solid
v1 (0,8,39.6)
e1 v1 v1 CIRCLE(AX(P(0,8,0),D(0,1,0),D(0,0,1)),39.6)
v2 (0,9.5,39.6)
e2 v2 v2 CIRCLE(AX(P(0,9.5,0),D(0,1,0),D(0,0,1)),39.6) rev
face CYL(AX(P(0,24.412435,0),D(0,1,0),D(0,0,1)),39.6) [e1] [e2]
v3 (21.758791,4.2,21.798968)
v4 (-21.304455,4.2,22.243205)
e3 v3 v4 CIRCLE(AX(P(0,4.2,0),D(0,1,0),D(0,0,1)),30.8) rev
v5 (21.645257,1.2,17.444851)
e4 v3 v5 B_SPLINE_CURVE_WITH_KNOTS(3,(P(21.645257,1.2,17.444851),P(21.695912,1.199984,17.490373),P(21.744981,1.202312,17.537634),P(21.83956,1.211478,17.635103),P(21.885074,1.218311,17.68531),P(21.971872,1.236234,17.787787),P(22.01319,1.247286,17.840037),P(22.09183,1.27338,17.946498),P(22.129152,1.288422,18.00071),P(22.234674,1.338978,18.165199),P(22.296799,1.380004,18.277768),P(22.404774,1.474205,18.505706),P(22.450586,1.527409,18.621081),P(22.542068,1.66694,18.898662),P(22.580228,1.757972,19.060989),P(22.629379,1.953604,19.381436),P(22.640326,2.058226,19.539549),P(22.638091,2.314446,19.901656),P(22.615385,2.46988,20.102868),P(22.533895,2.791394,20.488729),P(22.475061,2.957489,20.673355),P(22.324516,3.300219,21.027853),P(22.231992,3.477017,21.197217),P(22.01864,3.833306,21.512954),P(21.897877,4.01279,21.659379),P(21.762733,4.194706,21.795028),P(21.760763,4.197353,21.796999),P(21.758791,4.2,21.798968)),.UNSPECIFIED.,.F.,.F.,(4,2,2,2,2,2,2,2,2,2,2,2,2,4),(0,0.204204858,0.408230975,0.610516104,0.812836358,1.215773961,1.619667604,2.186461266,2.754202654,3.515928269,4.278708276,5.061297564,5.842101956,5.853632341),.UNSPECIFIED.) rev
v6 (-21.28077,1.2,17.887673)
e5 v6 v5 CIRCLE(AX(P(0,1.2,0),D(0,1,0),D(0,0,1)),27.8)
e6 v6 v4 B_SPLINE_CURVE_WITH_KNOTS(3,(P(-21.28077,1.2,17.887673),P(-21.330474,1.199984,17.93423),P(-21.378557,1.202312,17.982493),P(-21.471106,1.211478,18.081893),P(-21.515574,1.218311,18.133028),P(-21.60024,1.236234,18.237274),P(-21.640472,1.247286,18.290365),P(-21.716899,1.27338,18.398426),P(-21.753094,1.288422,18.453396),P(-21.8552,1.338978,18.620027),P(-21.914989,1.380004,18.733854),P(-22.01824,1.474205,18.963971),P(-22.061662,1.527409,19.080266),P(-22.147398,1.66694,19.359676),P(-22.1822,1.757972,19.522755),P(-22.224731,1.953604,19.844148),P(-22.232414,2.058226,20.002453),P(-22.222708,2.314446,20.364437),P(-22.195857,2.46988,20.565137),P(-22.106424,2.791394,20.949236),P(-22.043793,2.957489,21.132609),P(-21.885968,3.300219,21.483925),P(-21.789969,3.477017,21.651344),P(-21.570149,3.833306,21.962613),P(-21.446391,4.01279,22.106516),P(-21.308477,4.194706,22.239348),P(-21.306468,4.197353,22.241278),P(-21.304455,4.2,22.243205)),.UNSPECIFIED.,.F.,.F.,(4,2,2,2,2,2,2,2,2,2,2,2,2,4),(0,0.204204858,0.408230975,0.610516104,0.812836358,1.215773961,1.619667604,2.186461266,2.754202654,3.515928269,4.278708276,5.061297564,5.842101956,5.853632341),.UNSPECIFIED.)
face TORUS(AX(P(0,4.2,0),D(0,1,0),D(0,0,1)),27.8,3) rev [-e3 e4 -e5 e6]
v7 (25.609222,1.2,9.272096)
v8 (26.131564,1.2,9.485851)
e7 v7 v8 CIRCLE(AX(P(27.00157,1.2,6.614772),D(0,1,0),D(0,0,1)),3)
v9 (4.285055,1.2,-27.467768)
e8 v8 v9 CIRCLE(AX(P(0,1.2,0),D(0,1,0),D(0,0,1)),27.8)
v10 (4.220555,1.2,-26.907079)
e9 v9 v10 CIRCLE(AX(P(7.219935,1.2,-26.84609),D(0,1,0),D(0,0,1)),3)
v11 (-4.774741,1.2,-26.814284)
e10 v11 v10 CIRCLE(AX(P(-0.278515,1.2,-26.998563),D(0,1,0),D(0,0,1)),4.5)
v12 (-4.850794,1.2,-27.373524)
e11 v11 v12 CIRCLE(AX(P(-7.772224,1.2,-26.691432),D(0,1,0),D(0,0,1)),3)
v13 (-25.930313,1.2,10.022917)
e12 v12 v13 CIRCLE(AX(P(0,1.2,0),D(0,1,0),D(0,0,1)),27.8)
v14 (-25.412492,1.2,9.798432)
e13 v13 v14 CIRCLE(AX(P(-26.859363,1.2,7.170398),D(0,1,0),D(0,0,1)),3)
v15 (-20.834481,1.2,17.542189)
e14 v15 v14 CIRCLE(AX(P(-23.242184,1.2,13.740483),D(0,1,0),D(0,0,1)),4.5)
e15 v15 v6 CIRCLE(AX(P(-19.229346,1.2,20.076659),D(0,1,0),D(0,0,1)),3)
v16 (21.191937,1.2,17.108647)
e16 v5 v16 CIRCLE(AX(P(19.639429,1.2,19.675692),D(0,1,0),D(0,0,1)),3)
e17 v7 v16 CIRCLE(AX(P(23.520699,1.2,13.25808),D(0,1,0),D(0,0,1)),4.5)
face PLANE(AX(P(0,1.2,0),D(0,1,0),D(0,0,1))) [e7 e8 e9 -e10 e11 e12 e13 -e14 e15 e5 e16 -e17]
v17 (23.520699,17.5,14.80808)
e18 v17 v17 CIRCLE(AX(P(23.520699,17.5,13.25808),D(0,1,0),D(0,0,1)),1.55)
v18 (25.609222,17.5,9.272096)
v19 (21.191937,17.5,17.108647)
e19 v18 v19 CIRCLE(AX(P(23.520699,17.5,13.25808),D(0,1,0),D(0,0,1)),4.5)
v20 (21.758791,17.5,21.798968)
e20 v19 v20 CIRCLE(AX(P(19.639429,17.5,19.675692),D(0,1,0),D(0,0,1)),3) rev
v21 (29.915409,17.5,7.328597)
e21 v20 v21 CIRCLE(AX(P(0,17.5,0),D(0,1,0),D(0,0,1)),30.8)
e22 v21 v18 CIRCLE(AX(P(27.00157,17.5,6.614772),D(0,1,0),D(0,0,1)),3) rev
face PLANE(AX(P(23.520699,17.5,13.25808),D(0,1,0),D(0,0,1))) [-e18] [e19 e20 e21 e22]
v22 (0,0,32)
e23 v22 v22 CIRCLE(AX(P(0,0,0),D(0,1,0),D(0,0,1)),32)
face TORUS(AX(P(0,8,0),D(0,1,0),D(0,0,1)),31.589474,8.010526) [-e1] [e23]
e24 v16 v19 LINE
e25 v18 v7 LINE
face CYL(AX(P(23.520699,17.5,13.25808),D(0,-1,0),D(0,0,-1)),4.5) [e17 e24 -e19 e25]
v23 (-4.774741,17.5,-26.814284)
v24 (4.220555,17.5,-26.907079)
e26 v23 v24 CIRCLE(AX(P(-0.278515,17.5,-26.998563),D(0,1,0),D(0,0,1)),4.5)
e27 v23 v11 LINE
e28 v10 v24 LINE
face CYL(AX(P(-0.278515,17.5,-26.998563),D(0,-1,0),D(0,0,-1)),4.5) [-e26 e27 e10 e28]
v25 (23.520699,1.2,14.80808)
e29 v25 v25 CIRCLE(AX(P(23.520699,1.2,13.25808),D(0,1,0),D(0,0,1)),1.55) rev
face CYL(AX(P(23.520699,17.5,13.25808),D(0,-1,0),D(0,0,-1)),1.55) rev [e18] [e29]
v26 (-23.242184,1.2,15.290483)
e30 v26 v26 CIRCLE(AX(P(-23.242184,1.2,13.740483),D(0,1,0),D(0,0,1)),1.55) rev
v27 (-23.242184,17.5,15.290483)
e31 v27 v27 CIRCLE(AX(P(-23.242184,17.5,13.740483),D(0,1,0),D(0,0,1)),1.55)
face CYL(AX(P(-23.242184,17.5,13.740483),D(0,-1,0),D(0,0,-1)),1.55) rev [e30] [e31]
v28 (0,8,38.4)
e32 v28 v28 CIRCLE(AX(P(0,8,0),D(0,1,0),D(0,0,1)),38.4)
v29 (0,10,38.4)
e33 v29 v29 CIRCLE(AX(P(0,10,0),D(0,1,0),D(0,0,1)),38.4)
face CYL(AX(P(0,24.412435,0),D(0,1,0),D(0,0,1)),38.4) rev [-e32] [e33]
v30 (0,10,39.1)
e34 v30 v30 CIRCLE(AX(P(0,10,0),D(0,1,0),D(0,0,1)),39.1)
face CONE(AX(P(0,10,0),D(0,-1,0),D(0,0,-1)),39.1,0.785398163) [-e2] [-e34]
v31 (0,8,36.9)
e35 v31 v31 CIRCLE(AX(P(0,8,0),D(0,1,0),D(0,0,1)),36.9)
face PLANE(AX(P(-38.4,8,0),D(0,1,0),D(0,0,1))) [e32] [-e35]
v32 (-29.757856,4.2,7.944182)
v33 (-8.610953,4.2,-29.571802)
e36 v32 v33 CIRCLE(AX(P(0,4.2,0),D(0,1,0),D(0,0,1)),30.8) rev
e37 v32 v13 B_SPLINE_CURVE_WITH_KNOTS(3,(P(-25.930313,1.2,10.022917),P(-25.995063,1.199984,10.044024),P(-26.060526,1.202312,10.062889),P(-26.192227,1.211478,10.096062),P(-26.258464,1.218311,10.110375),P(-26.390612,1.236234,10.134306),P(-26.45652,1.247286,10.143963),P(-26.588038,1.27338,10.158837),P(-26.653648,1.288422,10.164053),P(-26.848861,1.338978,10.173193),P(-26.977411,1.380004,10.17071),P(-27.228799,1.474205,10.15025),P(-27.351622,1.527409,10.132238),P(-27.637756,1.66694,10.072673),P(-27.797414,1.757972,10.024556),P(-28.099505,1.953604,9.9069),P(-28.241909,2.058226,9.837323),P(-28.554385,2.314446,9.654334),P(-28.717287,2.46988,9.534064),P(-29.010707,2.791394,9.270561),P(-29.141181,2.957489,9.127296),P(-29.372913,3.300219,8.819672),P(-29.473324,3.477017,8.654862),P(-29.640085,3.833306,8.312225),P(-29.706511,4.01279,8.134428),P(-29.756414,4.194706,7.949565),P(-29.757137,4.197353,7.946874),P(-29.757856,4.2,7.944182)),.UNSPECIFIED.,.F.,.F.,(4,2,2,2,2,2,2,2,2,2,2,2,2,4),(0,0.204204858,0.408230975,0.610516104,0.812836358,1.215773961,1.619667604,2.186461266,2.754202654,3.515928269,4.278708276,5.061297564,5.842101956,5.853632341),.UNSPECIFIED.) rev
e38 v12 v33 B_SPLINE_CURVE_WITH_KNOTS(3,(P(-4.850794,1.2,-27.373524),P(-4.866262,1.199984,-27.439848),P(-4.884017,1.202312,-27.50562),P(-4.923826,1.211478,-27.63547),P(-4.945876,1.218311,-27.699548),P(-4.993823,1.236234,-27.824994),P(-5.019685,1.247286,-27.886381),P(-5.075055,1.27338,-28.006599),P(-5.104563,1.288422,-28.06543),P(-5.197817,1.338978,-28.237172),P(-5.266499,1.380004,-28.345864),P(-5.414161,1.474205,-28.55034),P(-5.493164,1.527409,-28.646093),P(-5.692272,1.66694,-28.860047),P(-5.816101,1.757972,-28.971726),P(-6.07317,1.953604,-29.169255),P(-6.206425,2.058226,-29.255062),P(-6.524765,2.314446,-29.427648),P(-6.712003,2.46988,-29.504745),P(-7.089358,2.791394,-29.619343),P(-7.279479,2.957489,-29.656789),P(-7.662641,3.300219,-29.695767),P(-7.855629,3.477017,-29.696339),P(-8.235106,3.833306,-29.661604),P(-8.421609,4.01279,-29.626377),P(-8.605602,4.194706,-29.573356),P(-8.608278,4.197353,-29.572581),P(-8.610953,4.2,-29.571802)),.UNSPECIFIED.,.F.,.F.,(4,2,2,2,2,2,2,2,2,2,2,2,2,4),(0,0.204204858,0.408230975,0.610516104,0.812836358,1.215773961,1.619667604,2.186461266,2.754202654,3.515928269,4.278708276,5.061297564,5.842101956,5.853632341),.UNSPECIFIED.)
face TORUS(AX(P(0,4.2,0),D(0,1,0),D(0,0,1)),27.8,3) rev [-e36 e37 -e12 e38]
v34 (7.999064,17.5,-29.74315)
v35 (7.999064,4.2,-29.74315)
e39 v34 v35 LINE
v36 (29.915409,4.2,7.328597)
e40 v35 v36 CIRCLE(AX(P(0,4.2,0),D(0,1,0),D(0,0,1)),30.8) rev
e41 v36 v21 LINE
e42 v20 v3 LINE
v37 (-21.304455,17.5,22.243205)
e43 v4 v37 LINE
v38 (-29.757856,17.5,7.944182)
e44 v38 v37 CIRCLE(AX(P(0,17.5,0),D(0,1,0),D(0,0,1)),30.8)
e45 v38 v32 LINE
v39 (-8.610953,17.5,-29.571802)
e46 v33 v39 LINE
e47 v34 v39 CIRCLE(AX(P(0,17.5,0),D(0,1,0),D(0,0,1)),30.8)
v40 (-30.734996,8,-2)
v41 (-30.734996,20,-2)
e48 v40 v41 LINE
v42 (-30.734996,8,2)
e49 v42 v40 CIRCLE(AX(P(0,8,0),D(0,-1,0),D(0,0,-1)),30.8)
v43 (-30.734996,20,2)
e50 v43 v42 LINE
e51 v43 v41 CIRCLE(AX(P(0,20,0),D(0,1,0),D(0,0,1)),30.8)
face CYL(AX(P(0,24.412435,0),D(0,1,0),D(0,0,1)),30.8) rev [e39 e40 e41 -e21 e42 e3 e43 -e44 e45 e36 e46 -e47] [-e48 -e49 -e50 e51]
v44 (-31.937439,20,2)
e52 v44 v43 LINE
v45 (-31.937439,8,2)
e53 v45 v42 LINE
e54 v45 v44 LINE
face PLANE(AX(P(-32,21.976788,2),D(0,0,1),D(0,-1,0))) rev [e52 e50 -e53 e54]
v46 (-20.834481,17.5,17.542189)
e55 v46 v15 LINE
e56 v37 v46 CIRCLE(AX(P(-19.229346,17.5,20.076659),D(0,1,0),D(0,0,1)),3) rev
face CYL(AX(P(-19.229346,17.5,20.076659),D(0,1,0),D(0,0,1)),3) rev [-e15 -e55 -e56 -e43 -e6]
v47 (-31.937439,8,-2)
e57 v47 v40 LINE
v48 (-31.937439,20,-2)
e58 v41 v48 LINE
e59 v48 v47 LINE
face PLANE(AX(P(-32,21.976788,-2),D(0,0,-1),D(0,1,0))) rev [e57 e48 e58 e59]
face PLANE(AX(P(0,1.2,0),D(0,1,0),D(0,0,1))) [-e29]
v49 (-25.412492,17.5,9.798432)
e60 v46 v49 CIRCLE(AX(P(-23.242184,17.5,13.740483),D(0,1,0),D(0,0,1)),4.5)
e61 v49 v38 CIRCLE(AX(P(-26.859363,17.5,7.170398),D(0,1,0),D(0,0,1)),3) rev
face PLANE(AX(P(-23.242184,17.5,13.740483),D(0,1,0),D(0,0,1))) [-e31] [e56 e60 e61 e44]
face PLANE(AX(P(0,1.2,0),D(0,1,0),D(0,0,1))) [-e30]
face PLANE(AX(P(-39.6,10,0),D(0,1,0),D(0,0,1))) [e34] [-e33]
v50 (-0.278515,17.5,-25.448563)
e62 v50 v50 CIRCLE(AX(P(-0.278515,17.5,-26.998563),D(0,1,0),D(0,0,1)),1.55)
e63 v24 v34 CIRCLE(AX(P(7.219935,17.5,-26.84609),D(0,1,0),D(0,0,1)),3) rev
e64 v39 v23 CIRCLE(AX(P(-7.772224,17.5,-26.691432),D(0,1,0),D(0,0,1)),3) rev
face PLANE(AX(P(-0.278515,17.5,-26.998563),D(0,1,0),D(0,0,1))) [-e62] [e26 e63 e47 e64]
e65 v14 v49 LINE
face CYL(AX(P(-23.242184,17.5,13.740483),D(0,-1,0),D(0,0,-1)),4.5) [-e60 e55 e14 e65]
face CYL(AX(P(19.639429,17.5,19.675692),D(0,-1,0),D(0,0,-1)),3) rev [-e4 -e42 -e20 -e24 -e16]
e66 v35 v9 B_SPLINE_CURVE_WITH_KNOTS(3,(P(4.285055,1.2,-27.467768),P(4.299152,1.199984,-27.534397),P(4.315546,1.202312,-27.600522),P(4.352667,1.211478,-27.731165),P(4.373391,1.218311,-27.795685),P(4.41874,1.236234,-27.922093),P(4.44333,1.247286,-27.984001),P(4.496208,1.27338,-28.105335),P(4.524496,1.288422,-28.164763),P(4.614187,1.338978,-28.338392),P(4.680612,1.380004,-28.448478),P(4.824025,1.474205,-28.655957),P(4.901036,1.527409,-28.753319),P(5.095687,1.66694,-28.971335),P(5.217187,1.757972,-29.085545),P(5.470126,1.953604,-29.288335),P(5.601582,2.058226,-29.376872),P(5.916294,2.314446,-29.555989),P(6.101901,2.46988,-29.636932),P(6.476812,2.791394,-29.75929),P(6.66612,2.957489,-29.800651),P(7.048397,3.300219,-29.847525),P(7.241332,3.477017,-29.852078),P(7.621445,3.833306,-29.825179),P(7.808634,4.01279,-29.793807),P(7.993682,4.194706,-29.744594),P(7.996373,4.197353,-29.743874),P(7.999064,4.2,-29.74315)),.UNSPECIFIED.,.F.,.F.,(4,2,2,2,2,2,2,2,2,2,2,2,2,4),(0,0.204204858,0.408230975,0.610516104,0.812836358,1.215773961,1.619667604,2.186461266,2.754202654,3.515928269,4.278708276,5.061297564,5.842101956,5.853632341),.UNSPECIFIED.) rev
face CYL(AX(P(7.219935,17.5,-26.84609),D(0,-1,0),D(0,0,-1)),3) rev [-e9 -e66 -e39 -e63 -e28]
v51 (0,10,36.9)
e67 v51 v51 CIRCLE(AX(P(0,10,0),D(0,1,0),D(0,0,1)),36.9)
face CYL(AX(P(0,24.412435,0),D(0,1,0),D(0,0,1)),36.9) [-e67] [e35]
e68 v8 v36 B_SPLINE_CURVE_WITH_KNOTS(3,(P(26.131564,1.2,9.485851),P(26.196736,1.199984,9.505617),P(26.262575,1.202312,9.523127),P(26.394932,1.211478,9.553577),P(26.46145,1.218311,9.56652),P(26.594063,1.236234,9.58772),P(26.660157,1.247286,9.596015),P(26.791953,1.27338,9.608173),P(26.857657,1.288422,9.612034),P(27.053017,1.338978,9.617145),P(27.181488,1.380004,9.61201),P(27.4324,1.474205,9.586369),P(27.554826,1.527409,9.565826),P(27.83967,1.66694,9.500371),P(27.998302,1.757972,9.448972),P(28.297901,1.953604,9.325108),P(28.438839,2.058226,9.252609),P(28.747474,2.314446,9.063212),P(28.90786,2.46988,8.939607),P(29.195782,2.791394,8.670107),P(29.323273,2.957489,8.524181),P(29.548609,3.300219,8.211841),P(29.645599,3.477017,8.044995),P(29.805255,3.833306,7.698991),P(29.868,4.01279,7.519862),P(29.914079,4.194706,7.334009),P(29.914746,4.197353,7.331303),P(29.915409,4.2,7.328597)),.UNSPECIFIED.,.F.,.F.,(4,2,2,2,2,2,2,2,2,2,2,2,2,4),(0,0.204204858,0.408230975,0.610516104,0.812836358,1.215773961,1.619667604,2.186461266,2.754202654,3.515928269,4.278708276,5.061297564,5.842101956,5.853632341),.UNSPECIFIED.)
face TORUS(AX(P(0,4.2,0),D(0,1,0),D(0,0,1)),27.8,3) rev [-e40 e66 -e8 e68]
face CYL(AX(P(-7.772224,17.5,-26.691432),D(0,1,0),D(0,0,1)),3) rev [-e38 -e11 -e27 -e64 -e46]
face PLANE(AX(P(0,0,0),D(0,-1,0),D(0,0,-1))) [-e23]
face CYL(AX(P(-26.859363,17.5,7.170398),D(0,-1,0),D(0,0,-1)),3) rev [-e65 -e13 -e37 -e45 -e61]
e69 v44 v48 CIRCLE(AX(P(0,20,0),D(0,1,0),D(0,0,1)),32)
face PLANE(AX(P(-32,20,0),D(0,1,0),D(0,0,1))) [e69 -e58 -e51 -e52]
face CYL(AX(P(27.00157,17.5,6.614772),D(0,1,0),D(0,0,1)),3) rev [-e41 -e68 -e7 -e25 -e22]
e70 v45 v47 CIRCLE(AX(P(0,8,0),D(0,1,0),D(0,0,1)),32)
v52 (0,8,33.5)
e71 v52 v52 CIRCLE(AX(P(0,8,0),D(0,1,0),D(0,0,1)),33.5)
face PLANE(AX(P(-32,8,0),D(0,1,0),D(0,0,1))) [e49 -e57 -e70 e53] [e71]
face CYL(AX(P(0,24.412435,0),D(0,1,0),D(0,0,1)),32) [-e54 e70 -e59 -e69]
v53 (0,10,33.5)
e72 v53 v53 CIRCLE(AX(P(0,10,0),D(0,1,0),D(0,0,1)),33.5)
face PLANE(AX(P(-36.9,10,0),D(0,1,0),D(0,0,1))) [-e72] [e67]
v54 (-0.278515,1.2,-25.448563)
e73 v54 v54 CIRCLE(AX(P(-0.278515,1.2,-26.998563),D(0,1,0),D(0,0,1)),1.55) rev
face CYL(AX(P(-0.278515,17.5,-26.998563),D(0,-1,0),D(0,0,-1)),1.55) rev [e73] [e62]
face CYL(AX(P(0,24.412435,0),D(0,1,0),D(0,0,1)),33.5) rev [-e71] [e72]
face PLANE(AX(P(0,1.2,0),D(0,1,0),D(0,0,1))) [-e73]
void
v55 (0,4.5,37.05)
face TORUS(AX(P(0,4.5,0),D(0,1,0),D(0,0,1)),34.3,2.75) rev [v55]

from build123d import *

# Parameters (mm, degrees)
ESQUISSE2_R             = 2.75
ESQUISSE3_W             = 4
ESQUISSE3_H             = 13.976787535
ENL_V_MAT_EXTRU_1_DEPTH = 32
ESQUISSE4_R             = 1.55
BOSS_EXTRU_1_DEPTH      = 16.3
CONG_1_START            = 1.2
CONG_1_2_OUTLINE_R      = 1.55
CONG_1_2_DEPTH          = 16.3
CONG_1_3_DEPTH          = 16.3
CHANFREIN1_SIZE         = 0.5


with BuildPart() as part:
    # Esquisse2 → Révolution1 (revolve)
    with BuildSketch(Plane.XY, mode=Mode.PRIVATE) as r_volution1_sk:
        with BuildLine():
            Line((-39.6, 8), (-39.6, 10))
            Line((-39.6, 10), (-38.4, 10))
            Line((-38.4, 10), (-38.4, 8))
            Line((-38.4, 8), (-36.9, 8))
            Line((-36.9, 8), (-36.9, 10))
            Line((-36.9, 10), (-33.5, 10))
            Line((-33.5, 10), (-33.5, 8))
            Line((-33.5, 8), (-32, 8))
            Line((-32, 8), (-32, 20))
            Line((-32, 20), (-30.8, 20))
            Line((-30.8, 20), (-30.8, 1.2))
            Line((-30.8, 1.2), (0, 1.2))
            Line((0, 1.2), (0, 0))
            Line((0, 0), (-32, 0))
            ThreePointArc((-32, 0), (-37.397100726, 2.48275431), (-39.6, 8))
        make_face()
        with Locations((-34.3, 4.5)):
            Circle(ESQUISSE2_R, mode=Mode.SUBTRACT)
    revolve(r_volution1_sk.sketch.rotate(Axis((0, 24.412434583, 0), (0, -1, 0)), 270), axis=Axis((0, 24.412434583, 0), (0, -1, 0)))

    # Esquisse3 → Enlèv. mat.-Extru.1 (cut)
    with BuildSketch(Plane(origin=(0, 0, 0), x_dir=(0, 0, -1), z_dir=(1, 0, 0))):
        with Locations((0, 14.988393767)):
            Rectangle(ESQUISSE3_W, ESQUISSE3_H)
    extrude(amount=-ENL_V_MAT_EXTRU_1_DEPTH, mode=Mode.SUBTRACT)

    # Esquisse4 → Boss.-Extru.1 (add)
    # profile 1 of 3: a face of its own
    with BuildSketch(Plane(origin=(0, 1.2, 0), x_dir=(1, 0, 0), z_dir=(0, 1, 0))):
        with BuildLine():
            Line((4.221484661, 26.998563466), (4.221484661, 30.649243024))
            ThreePointArc((4.221484661, 30.649243024), (-0.281509243, 30.937320233), (-4.778515339, 30.56734895))
            Line((-4.778515339, 30.56734895), (-4.778515339, 26.998563466))
            ThreePointArc((-4.778515339, 26.998563466), (-0.278515339, 22.498563466), (4.221484661, 26.998563466))
        make_face()
        with Locations(Location((-0.278515339, 26.998563466, 0), (0, 0, 270))):
            Circle(ESQUISSE4_R, mode=Mode.SUBTRACT)
    # profile 2 of 3: a face of its own
    with BuildSketch(Plane(origin=(0, 1.2, 0), x_dir=(1, 0, 0), z_dir=(0, 1, 0))):
        with BuildLine():
            Line((21.270699496, -17.155194691), (24.432280735, -18.98053447))
            ThreePointArc((24.432280735, -18.98053447), (26.933259869, -15.224865961), (28.861358387, -11.145358799))
            Line((28.861358387, -11.145358799), (25.770699496, -9.360966057))
            ThreePointArc((25.770699496, -9.360966057), (19.623585179, -11.008080374), (21.270699496, -17.155194691))
        make_face()
        with Locations(Location((23.520699496, -13.258080374, 0), (0, 0, 270))):
            Circle(ESQUISSE4_R, mode=Mode.SUBTRACT)
    # profile 3 of 3: a face of its own
    with BuildSketch(Plane(origin=(0, 1.2, 0), x_dir=(1, 0, 0), z_dir=(0, 1, 0))):
        with BuildLine():
            Line((-25.492184157, -9.843368775), (-28.653765396, -11.668708554))
            ThreePointArc((-28.653765396, -11.668708554), (-26.651750626, -15.712454273), (-24.082843047, -19.421990151))
            Line((-24.082843047, -19.421990151), (-20.992184157, -17.637597409))
            ThreePointArc((-20.992184157, -17.637597409), (-19.34506984, -11.490483092), (-25.492184157, -9.843368775))
        make_face()
        with Locations(Location((-23.242184157, -13.740483092, 0), (0, 0, 270))):
            Circle(ESQUISSE4_R, mode=Mode.SUBTRACT)
    extrude(amount=BOSS_EXTRU_1_DEPTH)

    # Congé1: read off the stored shape, not the designer's step
    # Congé1 outline → Congé1 (revolve)
    with BuildSketch(Plane.XY):
        with BuildLine():
            ThreePointArc((30.8, 4.2), (29.921320344, 2.078679656), (27.8, 1.2))
            Line((27.8, 1.2), (30.8, 1.2))
            Line((30.8, 1.2), (30.8, 4.2))
        make_face()
    revolve(axis=Axis((0, 0, 0), (0, 1, 0)))

    # Cong_1 2 outline → Cong_1 2 (cut)
    with BuildSketch(Plane(origin=(0, 0, 0), x_dir=(1, 0, 0), z_dir=(0, 1, 0)).offset(CONG_1_START)):
        with Locations((23.520699496, -13.258080374)):
            Circle(CONG_1_2_OUTLINE_R)
        with Locations((-0.278515339, 26.998563466)):
            Circle(CONG_1_2_OUTLINE_R)
        with Locations((-23.242184157, -13.740483092)):
            Circle(CONG_1_2_OUTLINE_R)
    extrude(amount=CONG_1_2_DEPTH, mode=Mode.SUBTRACT)

    # Cong_1 3 outline → Cong_1 3 (add)
    with BuildSketch(Plane(origin=(0, 0, 0), x_dir=(1, 0, 0), z_dir=(0, 1, 0)).offset(CONG_1_START)):
        with BuildLine():
            ThreePointArc((-21.304455292, -22.243205361), (-22.214465604, -19.778228467), (-20.834481269, -17.542188867))
            ThreePointArc((-20.834481269, -17.542188867), (-20.912844176, -17.590700651), (-20.992184157, -17.637597409))
            Line((-20.992184157, -17.637597409), (-23.961346562, -19.351844122))
            ThreePointArc((-23.961346562, -19.351844122), (-22.679025482, -20.839908905), (-21.304455292, -22.243205361))
        make_face()
        with BuildLine():
            ThreePointArc((-25.492184157, -9.843368775), (-25.452452065, -9.820697923), (-25.412491568, -9.798432136))
            ThreePointArc((-25.412491568, -9.798432136), (-28.036801715, -9.929680405), (-29.757855604, -7.944182139))
            ThreePointArc((-29.757855604, -7.944182139), (-29.202450702, -9.790652326), (-28.532595037, -11.598750815))
            Line((-28.532595037, -11.598750815), (-25.492184157, -9.843368775))
        make_face()
        with BuildLine():
            ThreePointArc((21.19193693, -17.108647204), (22.61775634, -19.315742323), (21.758791347, -21.798967846))
            ThreePointArc((21.758791347, -21.798967846), (23.080178985, -20.394737998), (24.311110376, -18.910576731))
            Line((24.311110376, -18.910576731), (21.270699496, -17.155194691))
            ThreePointArc((21.270699496, -17.155194691), (21.231199916, -17.132121116), (21.19193693, -17.108647204))
        make_face()
        with BuildLine():
            ThreePointArc((-4.778515339, 30.427056893), (-6.708377783, 30.060566653), (-8.610953258, 29.571802177))
            ThreePointArc((-8.610953258, 29.571802177), (-6.021215492, 29.127405778), (-4.774740562, 26.814284487))
            ThreePointArc((-4.774740562, 26.814284487), (-4.777571546, 26.906404648), (-4.778515339, 26.998563466))
            Line((-4.778515339, 26.998563466), (-4.778515339, 30.427056893))
        make_face()
        with BuildLine():
            ThreePointArc((29.91540855, -7.328596816), (28.235681096, -9.349177311), (25.609221831, -9.27209562))
            ThreePointArc((25.609221831, -9.27209562), (25.690415722, -9.315703997), (25.770699496, -9.360966057))
            Line((25.770699496, -9.360966057), (28.739861901, -11.07521277))
            ThreePointArc((28.739861901, -11.07521277), (29.387403266, -9.220657748), (29.91540855, -7.328596816))
        make_face()
        with BuildLine():
            ThreePointArc((4.221484661, 26.998563466), (4.221252149, 26.952819039), (4.220554638, 26.907079339))
            ThreePointArc((4.220554638, 26.907079339), (5.419045375, 29.245422728), (7.999064257, 29.743149985))
            ThreePointArc((7.999064257, 29.743149985), (6.122271717, 30.185390324), (4.221484661, 30.509327545))
            Line((4.221484661, 30.509327545), (4.221484661, 26.998563466))
        make_face()
    extrude(amount=CONG_1_3_DEPTH)

    # Chanfrein1
    chanfrein1_edges = [part.edges().sort_by_distance(p)[0] for p in [
        (0, 10, -39.6),
    ]]
    chamfer(chanfrein1_edges, length=CHANFREIN1_SIZE)


solid = part.part
